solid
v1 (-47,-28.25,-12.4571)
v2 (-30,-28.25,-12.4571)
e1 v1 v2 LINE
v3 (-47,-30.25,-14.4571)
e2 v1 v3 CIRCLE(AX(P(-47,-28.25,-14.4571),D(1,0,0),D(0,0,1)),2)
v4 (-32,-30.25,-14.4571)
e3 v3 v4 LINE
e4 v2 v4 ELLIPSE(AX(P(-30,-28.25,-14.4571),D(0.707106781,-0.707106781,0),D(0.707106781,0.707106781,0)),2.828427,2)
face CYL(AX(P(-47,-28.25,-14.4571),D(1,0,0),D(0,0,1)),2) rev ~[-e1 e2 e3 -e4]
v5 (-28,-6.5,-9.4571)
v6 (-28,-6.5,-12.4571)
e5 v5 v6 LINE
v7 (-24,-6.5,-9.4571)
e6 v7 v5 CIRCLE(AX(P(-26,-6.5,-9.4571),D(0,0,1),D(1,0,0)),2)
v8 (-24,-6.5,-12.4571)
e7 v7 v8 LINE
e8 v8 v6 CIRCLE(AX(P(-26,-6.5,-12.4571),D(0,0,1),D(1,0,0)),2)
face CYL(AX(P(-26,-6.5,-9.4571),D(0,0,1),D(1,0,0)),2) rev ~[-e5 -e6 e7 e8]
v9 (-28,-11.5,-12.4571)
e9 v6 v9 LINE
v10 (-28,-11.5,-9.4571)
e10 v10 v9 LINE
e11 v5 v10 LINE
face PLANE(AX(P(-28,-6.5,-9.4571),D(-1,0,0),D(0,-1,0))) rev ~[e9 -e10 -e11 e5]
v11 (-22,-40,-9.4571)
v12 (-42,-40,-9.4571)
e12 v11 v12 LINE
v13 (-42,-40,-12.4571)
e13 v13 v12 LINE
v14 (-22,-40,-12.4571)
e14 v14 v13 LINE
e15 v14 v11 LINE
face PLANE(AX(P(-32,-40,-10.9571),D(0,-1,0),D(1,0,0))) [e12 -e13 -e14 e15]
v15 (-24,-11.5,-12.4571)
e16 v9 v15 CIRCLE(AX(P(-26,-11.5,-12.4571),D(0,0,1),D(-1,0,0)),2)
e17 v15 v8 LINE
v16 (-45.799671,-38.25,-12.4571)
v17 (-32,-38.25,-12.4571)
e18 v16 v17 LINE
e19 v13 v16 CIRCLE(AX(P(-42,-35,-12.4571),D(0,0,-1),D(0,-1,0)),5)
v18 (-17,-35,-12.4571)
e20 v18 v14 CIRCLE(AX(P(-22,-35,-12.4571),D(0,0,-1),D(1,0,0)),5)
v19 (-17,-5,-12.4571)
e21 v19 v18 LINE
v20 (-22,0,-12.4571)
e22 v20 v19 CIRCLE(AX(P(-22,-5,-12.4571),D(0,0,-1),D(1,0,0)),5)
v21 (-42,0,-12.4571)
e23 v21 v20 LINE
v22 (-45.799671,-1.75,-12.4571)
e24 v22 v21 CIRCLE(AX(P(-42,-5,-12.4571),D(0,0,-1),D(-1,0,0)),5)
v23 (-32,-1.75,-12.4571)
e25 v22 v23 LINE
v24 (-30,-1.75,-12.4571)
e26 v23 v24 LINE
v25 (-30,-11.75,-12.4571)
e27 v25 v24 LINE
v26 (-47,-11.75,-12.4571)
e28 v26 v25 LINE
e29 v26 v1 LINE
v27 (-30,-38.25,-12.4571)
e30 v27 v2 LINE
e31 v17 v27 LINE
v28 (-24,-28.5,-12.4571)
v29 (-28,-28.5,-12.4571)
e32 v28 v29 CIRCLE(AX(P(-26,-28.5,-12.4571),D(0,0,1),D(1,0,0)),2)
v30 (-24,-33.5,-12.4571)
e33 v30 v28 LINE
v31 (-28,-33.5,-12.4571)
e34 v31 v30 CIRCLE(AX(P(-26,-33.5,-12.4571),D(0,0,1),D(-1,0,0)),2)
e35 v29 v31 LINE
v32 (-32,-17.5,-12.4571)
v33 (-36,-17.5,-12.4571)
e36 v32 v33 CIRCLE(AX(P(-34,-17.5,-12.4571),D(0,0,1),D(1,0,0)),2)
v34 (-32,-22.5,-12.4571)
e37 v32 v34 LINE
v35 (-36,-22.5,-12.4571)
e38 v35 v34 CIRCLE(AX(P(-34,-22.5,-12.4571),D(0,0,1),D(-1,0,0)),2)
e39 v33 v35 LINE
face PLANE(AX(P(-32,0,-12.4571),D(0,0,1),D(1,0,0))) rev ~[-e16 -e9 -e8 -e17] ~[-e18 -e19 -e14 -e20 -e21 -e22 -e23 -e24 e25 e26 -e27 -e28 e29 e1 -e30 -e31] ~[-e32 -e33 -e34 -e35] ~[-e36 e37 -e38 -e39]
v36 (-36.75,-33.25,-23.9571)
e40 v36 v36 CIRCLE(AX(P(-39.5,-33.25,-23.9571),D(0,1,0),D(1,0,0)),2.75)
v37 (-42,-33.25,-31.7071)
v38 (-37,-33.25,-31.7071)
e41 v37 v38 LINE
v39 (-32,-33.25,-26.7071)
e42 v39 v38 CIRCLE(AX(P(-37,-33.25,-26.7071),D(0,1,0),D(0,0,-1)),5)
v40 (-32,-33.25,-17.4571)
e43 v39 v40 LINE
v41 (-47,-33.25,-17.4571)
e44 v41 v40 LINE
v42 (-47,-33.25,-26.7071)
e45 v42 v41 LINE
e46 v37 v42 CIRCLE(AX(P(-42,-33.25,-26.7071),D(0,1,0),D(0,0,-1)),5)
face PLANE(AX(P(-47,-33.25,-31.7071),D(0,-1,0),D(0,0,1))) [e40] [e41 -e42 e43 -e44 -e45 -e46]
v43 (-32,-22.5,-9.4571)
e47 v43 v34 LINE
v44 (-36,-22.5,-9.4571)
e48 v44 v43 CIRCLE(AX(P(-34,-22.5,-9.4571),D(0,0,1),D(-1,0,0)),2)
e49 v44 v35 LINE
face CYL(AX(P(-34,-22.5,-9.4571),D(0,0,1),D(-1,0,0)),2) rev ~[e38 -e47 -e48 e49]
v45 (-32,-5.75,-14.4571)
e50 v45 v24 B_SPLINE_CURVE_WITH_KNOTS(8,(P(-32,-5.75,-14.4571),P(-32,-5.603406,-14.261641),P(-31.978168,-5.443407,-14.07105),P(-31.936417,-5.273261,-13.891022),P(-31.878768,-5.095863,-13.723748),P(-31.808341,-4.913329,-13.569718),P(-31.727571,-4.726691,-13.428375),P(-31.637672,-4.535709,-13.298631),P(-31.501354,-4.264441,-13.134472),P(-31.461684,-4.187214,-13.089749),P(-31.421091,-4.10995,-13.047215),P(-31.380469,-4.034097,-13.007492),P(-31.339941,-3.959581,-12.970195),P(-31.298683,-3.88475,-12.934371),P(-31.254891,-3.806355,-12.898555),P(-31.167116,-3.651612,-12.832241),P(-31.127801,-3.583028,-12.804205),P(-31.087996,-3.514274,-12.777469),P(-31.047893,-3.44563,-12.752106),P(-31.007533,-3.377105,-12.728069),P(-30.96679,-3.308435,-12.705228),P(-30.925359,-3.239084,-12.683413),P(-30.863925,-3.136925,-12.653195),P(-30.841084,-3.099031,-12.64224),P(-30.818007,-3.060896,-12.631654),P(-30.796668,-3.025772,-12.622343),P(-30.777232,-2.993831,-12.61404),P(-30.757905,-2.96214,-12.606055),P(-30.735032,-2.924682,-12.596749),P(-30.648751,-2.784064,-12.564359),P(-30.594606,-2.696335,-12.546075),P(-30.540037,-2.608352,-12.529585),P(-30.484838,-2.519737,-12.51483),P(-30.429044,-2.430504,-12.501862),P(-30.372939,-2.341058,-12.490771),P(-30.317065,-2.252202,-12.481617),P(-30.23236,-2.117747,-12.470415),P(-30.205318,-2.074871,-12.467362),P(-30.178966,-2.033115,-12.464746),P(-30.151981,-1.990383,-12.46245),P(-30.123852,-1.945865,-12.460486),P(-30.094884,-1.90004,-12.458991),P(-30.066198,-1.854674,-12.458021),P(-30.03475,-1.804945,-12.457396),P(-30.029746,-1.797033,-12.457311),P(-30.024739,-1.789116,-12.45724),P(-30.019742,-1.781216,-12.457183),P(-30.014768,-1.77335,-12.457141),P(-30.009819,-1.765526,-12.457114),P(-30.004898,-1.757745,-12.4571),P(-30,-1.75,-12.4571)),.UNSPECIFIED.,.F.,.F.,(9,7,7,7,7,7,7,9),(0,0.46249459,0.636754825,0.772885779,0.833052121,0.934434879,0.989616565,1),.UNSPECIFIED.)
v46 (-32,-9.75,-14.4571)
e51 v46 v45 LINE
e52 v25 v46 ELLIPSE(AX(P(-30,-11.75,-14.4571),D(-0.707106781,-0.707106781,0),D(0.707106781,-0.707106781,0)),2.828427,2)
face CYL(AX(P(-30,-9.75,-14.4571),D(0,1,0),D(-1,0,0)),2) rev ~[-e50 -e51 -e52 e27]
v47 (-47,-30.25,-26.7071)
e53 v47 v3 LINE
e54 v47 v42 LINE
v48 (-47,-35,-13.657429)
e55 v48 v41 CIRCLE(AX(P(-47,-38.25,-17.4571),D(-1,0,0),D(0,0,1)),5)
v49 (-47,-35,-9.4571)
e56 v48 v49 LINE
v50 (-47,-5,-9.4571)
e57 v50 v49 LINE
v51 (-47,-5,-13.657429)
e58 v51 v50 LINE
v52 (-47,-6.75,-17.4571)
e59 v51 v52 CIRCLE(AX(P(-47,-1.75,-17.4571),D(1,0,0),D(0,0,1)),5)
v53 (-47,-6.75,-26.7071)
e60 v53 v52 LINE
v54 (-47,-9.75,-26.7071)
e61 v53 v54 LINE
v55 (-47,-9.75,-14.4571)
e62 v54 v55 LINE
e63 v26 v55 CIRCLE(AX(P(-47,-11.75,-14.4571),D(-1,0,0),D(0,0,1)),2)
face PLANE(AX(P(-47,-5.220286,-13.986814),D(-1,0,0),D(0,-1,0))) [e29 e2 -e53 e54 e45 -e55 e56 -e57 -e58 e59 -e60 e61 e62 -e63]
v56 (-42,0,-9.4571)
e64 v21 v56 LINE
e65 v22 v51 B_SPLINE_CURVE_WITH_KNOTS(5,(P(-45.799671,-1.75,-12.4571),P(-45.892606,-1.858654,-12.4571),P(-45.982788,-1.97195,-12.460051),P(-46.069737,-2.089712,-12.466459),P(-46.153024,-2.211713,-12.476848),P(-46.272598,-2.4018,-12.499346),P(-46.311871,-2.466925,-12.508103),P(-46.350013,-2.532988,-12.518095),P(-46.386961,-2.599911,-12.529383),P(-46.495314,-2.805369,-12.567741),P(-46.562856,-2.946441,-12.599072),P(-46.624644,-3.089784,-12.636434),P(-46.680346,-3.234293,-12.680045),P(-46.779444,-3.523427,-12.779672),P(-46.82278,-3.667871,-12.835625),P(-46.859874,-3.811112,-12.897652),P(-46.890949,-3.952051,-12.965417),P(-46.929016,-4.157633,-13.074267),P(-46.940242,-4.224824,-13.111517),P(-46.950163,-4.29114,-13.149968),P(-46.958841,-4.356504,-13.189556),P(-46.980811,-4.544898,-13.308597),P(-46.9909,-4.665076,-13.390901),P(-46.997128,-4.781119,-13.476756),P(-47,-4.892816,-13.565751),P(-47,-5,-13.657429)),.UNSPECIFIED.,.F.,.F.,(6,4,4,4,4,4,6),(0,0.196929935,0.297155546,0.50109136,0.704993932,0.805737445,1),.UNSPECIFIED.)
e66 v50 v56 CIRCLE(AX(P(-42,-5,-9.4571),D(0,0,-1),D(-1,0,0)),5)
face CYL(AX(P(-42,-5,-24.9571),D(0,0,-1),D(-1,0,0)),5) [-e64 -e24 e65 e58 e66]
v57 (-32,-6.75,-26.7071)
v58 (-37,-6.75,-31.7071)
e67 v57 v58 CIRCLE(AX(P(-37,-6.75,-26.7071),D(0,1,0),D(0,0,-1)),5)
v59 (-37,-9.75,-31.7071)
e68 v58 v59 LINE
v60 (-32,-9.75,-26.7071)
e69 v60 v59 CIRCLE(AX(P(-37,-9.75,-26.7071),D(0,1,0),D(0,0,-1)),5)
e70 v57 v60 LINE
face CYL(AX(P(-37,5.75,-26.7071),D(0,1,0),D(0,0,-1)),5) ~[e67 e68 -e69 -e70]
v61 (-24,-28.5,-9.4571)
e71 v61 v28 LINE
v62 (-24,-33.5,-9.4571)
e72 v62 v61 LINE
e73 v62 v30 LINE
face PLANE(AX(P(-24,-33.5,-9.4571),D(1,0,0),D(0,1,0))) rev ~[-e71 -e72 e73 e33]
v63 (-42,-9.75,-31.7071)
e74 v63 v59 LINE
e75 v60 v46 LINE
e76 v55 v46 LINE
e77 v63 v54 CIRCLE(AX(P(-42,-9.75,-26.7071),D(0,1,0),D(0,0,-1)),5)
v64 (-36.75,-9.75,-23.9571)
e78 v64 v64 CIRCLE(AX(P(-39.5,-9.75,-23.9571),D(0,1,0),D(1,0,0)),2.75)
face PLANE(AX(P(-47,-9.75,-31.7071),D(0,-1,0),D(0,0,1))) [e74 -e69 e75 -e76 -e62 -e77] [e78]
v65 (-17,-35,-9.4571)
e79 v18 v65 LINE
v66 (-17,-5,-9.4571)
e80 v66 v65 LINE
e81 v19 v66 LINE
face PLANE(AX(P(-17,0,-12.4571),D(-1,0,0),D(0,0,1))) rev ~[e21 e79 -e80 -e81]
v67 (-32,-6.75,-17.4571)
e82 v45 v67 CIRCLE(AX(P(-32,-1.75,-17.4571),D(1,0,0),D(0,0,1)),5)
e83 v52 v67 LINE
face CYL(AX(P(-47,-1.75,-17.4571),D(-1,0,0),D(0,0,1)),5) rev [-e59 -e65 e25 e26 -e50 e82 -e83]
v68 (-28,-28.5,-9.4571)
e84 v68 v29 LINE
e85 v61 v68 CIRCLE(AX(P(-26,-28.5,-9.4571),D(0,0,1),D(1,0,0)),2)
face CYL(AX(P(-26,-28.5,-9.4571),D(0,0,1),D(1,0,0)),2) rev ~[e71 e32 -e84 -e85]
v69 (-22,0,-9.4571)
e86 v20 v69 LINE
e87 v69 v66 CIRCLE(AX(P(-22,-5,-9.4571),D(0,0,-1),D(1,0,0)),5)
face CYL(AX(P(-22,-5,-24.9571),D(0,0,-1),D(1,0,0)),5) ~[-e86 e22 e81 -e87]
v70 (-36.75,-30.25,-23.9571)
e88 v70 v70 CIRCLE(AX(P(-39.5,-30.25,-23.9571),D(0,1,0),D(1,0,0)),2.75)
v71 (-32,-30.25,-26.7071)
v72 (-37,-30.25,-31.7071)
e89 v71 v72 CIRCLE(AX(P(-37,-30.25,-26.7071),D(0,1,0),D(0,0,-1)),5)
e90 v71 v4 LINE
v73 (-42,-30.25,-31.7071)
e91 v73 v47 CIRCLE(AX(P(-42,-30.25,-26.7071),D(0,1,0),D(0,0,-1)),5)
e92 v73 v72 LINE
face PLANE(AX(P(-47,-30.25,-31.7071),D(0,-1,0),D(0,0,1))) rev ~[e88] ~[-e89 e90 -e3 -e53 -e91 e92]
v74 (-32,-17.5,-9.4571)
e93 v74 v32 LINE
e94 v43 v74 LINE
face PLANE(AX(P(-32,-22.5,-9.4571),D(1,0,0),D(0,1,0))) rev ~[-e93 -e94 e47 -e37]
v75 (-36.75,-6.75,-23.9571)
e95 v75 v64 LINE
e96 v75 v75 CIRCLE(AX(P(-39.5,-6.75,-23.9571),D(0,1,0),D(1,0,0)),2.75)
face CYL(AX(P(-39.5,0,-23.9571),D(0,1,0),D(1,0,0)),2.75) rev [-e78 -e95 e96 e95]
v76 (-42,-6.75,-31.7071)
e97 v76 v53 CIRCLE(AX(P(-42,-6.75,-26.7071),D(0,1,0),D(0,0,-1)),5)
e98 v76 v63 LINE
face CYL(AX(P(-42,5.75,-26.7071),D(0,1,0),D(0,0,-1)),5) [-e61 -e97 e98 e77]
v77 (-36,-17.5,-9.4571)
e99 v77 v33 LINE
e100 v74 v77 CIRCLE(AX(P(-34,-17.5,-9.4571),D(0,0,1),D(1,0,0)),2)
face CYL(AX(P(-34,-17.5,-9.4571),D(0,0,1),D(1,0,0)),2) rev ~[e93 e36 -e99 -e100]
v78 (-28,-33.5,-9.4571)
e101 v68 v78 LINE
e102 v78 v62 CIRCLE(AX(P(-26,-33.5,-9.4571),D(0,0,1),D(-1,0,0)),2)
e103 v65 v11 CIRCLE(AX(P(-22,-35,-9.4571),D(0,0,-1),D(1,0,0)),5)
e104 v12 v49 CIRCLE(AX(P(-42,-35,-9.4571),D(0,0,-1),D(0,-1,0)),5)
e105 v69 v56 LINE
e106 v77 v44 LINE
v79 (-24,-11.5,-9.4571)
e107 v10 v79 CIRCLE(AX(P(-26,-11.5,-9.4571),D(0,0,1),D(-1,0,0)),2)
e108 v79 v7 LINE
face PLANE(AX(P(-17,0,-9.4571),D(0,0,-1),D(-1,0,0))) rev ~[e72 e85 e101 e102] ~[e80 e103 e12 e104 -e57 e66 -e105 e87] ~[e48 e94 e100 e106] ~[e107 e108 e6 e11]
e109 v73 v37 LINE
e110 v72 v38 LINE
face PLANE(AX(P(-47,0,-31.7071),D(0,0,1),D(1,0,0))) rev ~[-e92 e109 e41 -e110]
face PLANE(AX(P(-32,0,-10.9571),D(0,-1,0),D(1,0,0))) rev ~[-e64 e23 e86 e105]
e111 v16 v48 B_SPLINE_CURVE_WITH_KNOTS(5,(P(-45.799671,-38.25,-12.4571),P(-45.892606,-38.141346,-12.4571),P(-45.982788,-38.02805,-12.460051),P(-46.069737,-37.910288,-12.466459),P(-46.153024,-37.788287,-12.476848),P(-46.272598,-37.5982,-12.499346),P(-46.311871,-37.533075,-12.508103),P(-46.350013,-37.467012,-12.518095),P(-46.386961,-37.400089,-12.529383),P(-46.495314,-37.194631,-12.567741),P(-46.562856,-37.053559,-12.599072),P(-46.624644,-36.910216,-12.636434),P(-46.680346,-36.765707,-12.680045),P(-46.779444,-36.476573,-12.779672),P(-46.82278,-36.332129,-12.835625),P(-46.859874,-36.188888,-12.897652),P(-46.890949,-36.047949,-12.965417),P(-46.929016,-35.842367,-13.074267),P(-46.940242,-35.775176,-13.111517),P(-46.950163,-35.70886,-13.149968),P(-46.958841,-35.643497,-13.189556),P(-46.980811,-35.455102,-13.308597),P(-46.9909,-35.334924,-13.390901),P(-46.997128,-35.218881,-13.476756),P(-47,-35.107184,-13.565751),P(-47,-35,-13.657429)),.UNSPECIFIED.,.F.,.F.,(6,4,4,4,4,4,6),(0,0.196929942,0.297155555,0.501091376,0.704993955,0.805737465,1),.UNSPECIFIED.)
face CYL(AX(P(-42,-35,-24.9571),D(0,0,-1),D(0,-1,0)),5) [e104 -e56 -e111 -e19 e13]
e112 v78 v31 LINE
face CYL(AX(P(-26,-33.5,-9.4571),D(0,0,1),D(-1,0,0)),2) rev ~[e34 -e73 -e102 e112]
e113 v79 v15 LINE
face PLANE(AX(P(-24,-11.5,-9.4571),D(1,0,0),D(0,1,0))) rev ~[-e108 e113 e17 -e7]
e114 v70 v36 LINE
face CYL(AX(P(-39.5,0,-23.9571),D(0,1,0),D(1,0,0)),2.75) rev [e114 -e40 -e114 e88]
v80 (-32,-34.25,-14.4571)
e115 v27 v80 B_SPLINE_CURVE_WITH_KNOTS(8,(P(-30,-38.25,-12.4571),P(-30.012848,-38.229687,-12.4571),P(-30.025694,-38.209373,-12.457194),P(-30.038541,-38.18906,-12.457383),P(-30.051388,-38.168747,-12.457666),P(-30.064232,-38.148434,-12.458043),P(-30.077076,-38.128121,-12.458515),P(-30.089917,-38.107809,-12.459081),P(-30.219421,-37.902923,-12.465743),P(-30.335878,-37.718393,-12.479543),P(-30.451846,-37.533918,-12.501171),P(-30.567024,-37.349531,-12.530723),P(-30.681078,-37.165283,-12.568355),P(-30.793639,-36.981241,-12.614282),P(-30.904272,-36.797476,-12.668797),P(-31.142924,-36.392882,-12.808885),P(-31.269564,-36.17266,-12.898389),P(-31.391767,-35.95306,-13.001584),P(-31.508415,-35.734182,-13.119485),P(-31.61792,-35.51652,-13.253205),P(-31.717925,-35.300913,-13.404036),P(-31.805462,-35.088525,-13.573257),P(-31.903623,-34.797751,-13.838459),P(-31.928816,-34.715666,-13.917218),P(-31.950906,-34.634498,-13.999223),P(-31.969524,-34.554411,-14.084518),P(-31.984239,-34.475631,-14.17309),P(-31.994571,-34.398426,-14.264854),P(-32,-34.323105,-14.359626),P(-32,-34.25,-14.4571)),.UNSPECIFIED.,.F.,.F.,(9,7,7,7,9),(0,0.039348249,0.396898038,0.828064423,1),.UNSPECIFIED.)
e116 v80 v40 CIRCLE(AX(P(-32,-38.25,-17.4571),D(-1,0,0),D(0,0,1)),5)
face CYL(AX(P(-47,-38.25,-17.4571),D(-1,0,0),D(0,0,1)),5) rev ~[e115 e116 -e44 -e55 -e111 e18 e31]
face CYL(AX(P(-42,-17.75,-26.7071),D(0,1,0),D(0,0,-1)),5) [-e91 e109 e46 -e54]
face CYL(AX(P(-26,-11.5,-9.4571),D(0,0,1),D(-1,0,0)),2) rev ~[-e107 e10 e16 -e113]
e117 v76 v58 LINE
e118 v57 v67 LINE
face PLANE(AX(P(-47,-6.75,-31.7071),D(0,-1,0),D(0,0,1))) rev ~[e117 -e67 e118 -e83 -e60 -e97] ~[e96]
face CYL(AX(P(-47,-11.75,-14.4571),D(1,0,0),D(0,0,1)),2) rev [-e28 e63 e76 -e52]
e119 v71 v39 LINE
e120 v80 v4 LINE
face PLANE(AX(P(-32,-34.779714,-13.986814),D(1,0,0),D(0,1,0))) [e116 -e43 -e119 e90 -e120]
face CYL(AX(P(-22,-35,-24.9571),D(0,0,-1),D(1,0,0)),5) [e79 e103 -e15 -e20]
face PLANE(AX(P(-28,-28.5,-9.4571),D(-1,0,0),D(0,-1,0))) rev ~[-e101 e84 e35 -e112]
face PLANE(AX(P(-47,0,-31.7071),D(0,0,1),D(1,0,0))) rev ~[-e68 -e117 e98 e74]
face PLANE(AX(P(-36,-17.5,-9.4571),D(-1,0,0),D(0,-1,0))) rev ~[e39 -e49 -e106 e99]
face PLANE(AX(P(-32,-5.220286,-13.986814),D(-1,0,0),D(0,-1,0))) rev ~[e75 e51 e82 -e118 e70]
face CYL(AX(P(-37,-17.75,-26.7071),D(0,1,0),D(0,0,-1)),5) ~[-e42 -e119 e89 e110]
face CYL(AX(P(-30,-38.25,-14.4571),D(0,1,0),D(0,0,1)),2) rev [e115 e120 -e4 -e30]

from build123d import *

# Parameters (mm, degrees)
F2_W        = 15
F2_H        = 19.25
F2_R        = 2.75
F3_DEPTH    = 40
F5_DEPTH    = 22.251
F6_W        = 6.75
F6_H        = 19.25
F6_W_2      = 20.5
F7_DEPTH    = 30.001
F8_T1_DEPTH = 15
F8_T3_DEPTH = 28
F8_T5_DEPTH = 28
F8_T7_DEPTH = 28
F10_R       = 2


# Not quite as in the source:
# - a fillet or chamfer that OpenCascade refuses, or shapes differently, is made with other operations: its cross-section is extruded or revolved along the edge and cut away or added
# - a feature of the source that left no trace in its solid (it failed there, or was rolled back) is left out


with BuildPart() as f3:
    # F2 (on Front) → F3 (new body)
    with BuildSketch(Plane.XZ):
        Polygon((-47, -12.4571), (-32, -12.4571), (-17, -12.4571), (-17, -9.4571), (-47, -9.4571), align=None)
        with Locations((-39.5, -22.0821)):
            Rectangle(F2_W, F2_H)
        with Locations((-39.5, -23.9571)):
            Circle(F2_R, mode=Mode.SUBTRACT)
    extrude(amount=F3_DEPTH)

    # F4 (on face) → F5 (cut, through all)
    with BuildSketch(Plane.XY.offset(-9.4571)):
        with BuildLine():
            Line((-24, -11.5), (-24, -6.5))
            ThreePointArc((-24, -6.5), (-26, -4.5), (-28, -6.5))
            Line((-28, -6.5), (-28, -11.5))
            ThreePointArc((-28, -11.5), (-26, -13.5), (-24, -11.5))
        make_face()
        with BuildLine():
            Line((-32, -22.5), (-32, -17.5))
            ThreePointArc((-32, -17.5), (-34, -15.5), (-36, -17.5))
            Line((-36, -17.5), (-36, -22.5))
            ThreePointArc((-36, -22.5), (-34, -24.5), (-32, -22.5))
        make_face()
        with BuildLine():
            ThreePointArc((-28, -33.5), (-26, -35.5), (-24, -33.5))
            Line((-24, -33.5), (-24, -28.5))
            ThreePointArc((-24, -28.5), (-26, -26.5), (-28, -28.5))
            Line((-28, -28.5), (-28, -33.5))
        make_face()
    extrude(amount=-F5_DEPTH, mode=Mode.SUBTRACT)

    # F6 (on face) → F7 (cut, through all)
    with BuildSketch(Plane(origin=(-47, 0, 0), x_dir=(0, -1, 0), z_dir=(-1, 0, 0))):
        with Locations((3.375, -22.0821)):
            Rectangle(F6_W, F6_H)
        with Locations((20, -22.0821)):
            Rectangle(F6_W_2, F6_H)
        with Locations((36.625, -22.0821)):
            Rectangle(F6_W, F6_H)
    extrude(amount=-F7_DEPTH, mode=Mode.SUBTRACT)

    # F8: fillet of radius 5 on 10 edges, made by hand

    # F8_s2 → F8_t1 (join)
    with BuildSketch(Plane.YZ.offset(-47)):
        with BuildLine():
            ThreePointArc((-1.75, -12.4571), (-5.2855339059, -13.9215660941), (-6.75, -17.4571))
            Line((-6.75, -17.4571), (-6.75, -12.4571))
            Line((-6.75, -12.4571), (-1.75, -12.4571))
        make_face()
        with BuildLine():
            ThreePointArc((-38.25, -12.4571), (-34.7144660941, -13.9215660941), (-33.25, -17.4571))
            Line((-33.25, -17.4571), (-33.25, -12.4571))
            Line((-33.25, -12.4571), (-38.25, -12.4571))
        make_face()
    extrude(amount=F8_T1_DEPTH)

    # F8_s4 → F8_t3 (cut)
    with BuildSketch(Plane.XY.offset(-24.9571)):
        with BuildLine():
            ThreePointArc((-17, -5), (-18.4644660941, -1.4644660941), (-22, 0))
            Line((-22, 0), (-17, 0))
            Line((-17, 0), (-17, -5))
        make_face()
        with BuildLine():
            ThreePointArc((-17, -35), (-18.4644660941, -38.5355339059), (-22, -40))
            Line((-22, -40), (-17, -40))
            Line((-17, -40), (-17, -35))
        make_face()
        with BuildLine():
            ThreePointArc((-47, -5), (-45.5355339059, -1.4644660941), (-42, 0))
            Line((-42, 0), (-47, 0))
            Line((-47, 0), (-47, -5))
        make_face()
        with BuildLine():
            ThreePointArc((-42, -40), (-45.5355339059, -38.5355339059), (-47, -35))
            Line((-47, -35), (-47, -40))
            Line((-47, -40), (-42, -40))
        make_face()
    extrude(amount=F8_T3_DEPTH, mode=Mode.SUBTRACT)

    # F8_s6 → F8_t5 (cut)
    with BuildSketch(Plane.XZ.offset(17.75)):
        with BuildLine():
            ThreePointArc((-42, -31.7071), (-45.5355339059, -30.2426339059), (-47, -26.7071))
            Line((-47, -26.7071), (-47, -31.7071))
            Line((-47, -31.7071), (-42, -31.7071))
        make_face()
        with BuildLine():
            ThreePointArc((-37, -31.7071), (-33.4644660941, -30.2426339059), (-32, -26.7071))
            Line((-32, -26.7071), (-32, -31.7071))
            Line((-32, -31.7071), (-37, -31.7071))
        make_face()
    extrude(amount=F8_T5_DEPTH, mode=Mode.SUBTRACT)

    # F8_s8 → F8_t7 (cut)
    with BuildSketch(Plane.XZ.offset(-5.75)):
        with BuildLine():
            ThreePointArc((-42, -31.7071), (-45.5355339059, -30.2426339059), (-47, -26.7071))
            Line((-47, -26.7071), (-47, -31.7071))
            Line((-47, -31.7071), (-42, -31.7071))
        make_face()
        with BuildLine():
            ThreePointArc((-37, -31.7071), (-33.4644660941, -30.2426339059), (-32, -26.7071))
            Line((-32, -26.7071), (-32, -31.7071))
            Line((-32, -31.7071), (-37, -31.7071))
        make_face()
    extrude(amount=F8_T7_DEPTH, mode=Mode.SUBTRACT)

    # F10
    f10_edges = [f3.edges().sort_by_distance(p)[0] for p in [
        (-39.5, -30.25, -12.4571),
        (-39.5, -9.75, -12.4571),
        (-32, -34.25, -12.4571),
        (-32, -5.75, -12.4571),
    ]]
    fillet(f10_edges, radius=F10_R)


solid = f3.part
